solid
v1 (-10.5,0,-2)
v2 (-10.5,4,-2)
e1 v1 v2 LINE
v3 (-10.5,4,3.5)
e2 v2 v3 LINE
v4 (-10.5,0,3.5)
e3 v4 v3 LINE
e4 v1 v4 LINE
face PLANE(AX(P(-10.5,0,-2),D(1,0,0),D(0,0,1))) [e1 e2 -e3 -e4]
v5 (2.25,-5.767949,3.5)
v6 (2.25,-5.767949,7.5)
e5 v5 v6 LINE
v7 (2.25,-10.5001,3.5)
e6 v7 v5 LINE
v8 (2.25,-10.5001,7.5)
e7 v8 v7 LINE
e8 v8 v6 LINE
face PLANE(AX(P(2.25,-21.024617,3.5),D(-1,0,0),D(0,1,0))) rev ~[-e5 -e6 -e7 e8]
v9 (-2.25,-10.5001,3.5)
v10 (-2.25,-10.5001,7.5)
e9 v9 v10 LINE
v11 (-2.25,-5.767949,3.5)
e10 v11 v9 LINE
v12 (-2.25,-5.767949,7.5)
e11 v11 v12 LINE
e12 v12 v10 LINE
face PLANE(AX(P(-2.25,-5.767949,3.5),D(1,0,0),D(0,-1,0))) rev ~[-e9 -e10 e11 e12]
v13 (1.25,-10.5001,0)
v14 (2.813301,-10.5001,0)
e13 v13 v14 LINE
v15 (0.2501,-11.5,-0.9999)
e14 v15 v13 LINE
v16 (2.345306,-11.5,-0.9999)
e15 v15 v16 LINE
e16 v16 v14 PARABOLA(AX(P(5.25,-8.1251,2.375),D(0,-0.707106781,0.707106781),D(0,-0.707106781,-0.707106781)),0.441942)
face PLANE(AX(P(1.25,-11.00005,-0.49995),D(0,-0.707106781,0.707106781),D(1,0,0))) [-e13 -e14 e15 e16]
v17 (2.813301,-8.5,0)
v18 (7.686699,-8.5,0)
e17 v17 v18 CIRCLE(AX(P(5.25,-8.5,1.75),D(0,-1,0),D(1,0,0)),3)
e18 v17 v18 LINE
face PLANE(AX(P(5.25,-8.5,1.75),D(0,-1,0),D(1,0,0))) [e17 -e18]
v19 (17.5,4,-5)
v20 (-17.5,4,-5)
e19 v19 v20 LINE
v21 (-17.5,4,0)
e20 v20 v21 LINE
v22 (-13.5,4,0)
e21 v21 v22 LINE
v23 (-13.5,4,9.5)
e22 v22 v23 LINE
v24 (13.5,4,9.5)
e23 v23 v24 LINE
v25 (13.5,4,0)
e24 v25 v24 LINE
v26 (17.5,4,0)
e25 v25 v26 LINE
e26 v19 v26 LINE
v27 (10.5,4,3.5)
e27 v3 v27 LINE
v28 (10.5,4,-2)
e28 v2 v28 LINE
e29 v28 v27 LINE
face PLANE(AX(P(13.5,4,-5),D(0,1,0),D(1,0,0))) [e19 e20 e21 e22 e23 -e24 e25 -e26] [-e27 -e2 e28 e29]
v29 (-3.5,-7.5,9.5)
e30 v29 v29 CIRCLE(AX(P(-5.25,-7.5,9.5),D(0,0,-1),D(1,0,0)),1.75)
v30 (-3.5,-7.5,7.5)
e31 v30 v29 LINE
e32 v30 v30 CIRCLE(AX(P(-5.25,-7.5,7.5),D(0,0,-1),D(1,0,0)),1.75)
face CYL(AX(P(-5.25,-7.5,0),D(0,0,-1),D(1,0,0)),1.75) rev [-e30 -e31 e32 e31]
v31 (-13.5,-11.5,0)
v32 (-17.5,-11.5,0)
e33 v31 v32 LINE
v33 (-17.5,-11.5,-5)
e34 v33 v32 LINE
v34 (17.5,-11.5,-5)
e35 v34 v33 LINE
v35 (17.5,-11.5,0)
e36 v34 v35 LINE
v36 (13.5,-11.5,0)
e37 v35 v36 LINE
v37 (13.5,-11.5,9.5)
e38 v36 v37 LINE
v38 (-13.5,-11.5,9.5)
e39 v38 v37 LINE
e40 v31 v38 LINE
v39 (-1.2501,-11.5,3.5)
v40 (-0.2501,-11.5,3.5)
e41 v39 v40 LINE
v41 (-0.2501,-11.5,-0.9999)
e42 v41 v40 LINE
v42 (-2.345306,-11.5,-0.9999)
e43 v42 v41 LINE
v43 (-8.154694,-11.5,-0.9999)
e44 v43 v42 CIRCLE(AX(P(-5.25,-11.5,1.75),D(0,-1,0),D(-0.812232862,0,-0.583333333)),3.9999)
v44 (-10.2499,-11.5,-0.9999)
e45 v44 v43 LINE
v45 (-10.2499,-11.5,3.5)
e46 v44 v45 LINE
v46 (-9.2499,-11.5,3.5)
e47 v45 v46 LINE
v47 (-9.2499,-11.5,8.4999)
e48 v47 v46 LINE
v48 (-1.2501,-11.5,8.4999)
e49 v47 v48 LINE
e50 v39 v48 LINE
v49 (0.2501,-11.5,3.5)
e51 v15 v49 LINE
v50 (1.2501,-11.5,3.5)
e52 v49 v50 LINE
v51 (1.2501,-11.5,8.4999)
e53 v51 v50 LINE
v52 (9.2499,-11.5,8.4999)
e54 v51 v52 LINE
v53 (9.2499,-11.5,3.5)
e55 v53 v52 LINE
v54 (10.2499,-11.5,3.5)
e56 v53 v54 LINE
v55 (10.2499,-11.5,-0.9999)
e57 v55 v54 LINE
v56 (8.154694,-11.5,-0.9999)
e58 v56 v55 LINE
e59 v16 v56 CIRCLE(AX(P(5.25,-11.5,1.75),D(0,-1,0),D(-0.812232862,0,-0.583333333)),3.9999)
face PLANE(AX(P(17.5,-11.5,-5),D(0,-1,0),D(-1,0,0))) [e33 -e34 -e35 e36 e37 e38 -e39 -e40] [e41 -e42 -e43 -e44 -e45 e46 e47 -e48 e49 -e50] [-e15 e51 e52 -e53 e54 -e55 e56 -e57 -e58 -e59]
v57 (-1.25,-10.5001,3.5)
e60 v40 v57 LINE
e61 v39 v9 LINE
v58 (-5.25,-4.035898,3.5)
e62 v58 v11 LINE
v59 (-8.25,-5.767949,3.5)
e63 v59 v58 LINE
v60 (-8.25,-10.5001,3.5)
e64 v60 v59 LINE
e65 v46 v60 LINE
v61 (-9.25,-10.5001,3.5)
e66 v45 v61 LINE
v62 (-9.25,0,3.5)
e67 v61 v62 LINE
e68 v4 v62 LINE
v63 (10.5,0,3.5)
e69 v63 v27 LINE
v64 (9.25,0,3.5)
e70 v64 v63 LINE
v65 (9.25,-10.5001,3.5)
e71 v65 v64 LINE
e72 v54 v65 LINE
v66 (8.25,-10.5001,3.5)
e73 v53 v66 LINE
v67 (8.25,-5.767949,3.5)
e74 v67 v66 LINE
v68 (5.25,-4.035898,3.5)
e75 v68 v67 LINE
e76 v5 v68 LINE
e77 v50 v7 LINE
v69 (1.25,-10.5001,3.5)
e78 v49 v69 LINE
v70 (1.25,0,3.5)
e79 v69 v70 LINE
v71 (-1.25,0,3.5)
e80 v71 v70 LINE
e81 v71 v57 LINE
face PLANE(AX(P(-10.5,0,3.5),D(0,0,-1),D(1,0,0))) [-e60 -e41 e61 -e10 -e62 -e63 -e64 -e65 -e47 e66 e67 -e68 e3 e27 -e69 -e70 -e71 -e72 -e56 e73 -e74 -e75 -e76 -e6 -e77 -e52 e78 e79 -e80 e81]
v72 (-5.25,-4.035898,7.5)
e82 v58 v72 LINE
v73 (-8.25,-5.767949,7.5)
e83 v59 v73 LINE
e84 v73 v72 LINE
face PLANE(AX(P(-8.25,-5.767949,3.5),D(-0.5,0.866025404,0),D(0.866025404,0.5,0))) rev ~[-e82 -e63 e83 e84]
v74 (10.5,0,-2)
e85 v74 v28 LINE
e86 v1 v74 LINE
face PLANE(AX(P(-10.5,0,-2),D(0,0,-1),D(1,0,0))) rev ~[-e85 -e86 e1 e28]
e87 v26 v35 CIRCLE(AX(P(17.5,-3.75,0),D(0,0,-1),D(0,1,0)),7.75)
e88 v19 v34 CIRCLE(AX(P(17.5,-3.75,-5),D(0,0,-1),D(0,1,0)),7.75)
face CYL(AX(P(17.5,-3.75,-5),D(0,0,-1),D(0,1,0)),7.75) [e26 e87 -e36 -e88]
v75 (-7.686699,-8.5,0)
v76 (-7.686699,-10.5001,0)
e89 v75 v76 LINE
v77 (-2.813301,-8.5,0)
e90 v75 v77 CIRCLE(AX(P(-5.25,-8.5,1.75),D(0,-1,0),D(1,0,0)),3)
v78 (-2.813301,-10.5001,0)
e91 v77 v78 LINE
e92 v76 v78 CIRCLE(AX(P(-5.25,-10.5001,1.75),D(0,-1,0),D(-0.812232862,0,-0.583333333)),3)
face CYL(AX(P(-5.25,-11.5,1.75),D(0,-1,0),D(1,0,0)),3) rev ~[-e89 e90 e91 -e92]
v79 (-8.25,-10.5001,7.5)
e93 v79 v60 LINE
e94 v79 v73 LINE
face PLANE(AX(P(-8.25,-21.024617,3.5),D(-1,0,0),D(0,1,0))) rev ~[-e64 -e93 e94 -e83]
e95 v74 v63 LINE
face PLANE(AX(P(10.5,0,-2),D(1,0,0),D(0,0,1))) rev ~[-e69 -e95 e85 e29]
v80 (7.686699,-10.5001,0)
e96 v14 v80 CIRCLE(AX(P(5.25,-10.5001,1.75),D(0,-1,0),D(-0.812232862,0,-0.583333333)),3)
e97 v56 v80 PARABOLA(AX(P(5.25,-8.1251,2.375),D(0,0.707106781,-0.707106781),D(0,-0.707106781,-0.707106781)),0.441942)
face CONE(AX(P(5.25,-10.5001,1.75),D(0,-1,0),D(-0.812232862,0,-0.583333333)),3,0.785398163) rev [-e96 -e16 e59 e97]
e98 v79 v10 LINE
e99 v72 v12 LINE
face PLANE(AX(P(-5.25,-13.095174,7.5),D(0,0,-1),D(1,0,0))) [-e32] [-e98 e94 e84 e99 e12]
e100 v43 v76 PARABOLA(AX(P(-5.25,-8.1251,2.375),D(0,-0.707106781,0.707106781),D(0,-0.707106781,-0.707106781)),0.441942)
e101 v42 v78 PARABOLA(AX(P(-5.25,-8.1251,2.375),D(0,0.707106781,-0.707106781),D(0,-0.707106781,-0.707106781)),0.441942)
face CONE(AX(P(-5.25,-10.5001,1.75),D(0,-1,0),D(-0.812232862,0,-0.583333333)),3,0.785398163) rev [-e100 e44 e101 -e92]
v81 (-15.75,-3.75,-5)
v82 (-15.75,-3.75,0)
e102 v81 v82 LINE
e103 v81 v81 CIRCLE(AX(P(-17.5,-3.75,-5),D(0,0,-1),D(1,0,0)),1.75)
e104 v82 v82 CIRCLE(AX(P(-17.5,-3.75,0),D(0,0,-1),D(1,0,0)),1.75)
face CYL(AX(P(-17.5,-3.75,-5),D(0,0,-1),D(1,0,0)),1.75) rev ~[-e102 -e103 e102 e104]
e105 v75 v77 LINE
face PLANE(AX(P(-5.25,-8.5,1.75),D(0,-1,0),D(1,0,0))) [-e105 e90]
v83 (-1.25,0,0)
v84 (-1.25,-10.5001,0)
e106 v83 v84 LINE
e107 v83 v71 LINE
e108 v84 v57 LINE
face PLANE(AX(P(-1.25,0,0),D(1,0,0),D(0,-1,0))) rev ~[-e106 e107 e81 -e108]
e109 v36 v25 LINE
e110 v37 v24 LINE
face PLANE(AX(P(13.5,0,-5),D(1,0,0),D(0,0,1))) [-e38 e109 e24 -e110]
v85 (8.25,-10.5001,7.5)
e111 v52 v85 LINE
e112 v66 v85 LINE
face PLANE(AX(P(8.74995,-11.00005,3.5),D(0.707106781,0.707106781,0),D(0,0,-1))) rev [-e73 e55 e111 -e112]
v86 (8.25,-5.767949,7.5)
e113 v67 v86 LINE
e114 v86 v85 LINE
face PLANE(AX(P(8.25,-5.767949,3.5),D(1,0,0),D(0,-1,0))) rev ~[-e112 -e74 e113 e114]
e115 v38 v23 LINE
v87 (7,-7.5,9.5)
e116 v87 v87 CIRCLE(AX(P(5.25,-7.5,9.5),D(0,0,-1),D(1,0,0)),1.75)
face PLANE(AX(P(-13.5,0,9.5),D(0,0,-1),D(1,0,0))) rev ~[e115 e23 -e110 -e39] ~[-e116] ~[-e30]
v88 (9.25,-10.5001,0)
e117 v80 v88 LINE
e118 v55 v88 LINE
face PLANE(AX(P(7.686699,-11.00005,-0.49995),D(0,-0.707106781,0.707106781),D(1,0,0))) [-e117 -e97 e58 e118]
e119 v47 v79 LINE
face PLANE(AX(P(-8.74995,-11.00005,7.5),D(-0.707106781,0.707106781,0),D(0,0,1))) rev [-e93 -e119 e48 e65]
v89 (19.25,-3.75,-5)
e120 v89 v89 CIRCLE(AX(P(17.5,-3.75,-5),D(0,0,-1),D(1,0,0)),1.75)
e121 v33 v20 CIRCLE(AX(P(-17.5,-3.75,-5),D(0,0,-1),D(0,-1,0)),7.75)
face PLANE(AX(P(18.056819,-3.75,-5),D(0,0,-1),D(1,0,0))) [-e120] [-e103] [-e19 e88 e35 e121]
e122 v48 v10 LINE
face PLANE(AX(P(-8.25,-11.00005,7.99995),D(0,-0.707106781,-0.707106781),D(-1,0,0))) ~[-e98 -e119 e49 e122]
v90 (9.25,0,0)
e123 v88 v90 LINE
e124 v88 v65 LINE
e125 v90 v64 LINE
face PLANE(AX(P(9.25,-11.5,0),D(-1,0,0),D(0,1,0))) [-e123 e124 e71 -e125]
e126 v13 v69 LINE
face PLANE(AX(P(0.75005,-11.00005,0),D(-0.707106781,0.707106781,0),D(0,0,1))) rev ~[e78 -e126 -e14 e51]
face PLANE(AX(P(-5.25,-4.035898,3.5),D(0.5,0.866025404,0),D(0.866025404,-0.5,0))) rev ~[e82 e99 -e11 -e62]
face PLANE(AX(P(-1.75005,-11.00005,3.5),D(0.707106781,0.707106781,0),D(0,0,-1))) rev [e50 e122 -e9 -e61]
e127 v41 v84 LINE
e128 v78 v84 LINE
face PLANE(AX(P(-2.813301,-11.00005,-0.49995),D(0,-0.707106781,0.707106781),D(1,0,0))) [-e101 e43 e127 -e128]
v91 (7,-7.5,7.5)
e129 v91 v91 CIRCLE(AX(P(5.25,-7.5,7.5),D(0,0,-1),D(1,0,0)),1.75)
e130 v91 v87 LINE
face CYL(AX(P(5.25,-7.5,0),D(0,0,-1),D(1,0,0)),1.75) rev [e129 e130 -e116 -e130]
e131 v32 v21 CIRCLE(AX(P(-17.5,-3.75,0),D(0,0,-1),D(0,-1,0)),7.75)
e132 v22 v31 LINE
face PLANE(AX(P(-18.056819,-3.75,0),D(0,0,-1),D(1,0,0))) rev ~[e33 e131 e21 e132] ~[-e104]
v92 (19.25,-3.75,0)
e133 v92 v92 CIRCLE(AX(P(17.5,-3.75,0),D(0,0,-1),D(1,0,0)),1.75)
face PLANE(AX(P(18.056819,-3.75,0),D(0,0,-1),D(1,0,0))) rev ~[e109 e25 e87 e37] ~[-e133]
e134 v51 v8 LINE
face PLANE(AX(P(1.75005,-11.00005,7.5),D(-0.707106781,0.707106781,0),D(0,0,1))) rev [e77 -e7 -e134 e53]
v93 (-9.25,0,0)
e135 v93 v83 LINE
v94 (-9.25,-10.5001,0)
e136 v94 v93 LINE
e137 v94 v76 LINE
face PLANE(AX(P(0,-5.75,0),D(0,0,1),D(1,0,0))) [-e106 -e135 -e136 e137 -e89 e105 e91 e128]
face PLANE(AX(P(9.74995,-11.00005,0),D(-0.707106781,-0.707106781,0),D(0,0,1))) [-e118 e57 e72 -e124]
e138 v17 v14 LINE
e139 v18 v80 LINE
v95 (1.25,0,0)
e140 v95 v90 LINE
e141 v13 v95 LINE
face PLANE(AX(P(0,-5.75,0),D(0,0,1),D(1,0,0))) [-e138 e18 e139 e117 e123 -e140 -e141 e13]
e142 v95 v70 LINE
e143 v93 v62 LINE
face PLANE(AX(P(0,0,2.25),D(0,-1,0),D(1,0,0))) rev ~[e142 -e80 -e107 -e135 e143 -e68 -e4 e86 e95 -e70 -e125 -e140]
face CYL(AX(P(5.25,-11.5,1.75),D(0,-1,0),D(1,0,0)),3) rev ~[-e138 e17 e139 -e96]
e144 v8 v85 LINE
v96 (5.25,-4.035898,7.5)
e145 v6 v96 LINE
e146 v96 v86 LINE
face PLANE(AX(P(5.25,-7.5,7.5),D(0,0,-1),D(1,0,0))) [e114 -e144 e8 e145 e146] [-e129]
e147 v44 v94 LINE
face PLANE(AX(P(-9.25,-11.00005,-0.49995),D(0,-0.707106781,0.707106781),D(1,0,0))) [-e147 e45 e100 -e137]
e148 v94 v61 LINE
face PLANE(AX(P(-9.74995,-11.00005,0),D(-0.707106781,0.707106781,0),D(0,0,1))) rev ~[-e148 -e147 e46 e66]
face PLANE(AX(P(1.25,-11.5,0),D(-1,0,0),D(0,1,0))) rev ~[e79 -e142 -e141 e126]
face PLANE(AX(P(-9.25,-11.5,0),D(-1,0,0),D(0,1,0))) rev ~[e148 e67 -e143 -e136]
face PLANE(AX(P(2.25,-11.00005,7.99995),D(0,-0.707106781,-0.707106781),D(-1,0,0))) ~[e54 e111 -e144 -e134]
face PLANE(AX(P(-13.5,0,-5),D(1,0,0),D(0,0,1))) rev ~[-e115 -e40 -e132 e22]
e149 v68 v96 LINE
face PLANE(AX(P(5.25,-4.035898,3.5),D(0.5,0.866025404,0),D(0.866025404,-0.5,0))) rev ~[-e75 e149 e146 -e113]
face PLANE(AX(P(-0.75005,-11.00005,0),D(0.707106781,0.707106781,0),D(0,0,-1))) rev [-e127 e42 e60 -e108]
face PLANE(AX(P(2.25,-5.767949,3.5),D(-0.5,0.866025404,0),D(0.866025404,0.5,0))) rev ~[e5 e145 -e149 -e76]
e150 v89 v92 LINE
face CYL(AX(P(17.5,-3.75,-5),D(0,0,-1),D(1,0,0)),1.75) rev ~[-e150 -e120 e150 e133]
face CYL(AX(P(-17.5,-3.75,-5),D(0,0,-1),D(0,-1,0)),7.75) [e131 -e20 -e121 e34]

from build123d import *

# Parameters (mm, degrees)
F1_DEPTH      = 3.5
F0_W          = 1.25
F0_H          = 11.5
F2_W          = 21
F2_H          = 11.5
F3_DEPTH      = 2
F4_W          = 27
F4_H          = 14.5
F4_W_2        = 21
F4_H_2        = 5.5
F5_DEPTH      = 11.5
F5_DEPTH_BACK = 4
F6_R          = 1.75
F7_DEPTH      = 25
F9_DEPTH      = 4
F10_R         = 3
F11_DEPTH     = 3
F12_SIZE      = 0.9999
F13_R         = 1.75
F14_DEPTH     = 5


# Not quite as in the source:
# - a fillet or chamfer is up to 0.001 mm smaller than in the source, because OpenCascade refuses the exact size


with BuildPart() as f1:
    # F0 (on Top) → F1 (new body)
    with BuildSketch(Plane.XY):
        Polygon((1.25, 0), (0, 0), (-1.25, 0), (-1.25, -11.5), (0, -11.5), (1.25, -11.5), align=None)
    extrude(amount=F1_DEPTH)



with BuildPart() as f1b:
    # F0 (on Top) → F1, piece 2 (new body)
    with BuildSketch(Plane.XY):
        with Locations((-9.875, -5.75)):
            Rectangle(F0_W, F0_H)
    extrude(amount=F1_DEPTH)


with BuildPart() as f1c:
    # F0 (on Top) → F1, piece 3 (new body)
    with BuildSketch(Plane.XY):
        with Locations((9.875, -5.75)):
            Rectangle(F0_W, F0_H)
    extrude(amount=F1_DEPTH)


with BuildPart() as f1_1:
    add(f1.part)

    add(f1b.part)  # F3 merges F1b

    add(f1c.part)  # F3 merges F1c
    # F2 (on Top) → F3 (join)
    with BuildSketch(Plane.XY):
        with Locations((0, -5.75)):
            Rectangle(F2_W, F2_H)
    extrude(amount=-F3_DEPTH)

    # F4 (on Front) → F5 (join, two sides)
    with BuildSketch(Plane.XZ) as f5_sk:
        with Locations((0, 2.25)):
            Rectangle(F4_W, F4_H)
        with Locations((0, 0.75)):
            Rectangle(F4_W_2, F4_H_2, mode=Mode.SUBTRACT)
    extrude(amount=F5_DEPTH)
    extrude(f5_sk.sketch, amount=-F5_DEPTH_BACK)

    # F6 (on face) → F7 (cut)
    with BuildSketch(Plane.XY):
        with Locations((5.25, -7.5)):
            Circle(F6_R)
        with Locations((-5.25, -7.5)):
            Circle(F6_R)
    extrude(amount=F7_DEPTH, mode=Mode.SUBTRACT)

    # F8 (on face) → F9 (cut)
    with BuildSketch(Plane(origin=(0, 0, 3.5), x_dir=(1, 0, 0), z_dir=(0, 0, -1))):
        Polygon((2.25, 5.7679491924), (5.25, 4.0358983849), (8.25, 5.7679491924), (8.25, 9.2320508076), (5.25, 10.9641016151), (2.25, 9.2320508076), align=None)
        Polygon((2.25, 21.0246167397), (2.25, 9.2320508076), (5.25, 10.9641016151), (8.25, 9.2320508076), (8.25, 21.0246167397), align=None)
        Polygon((-2.25, 21.0246167397), (-8.25, 21.0246167397), (-8.25, 9.2320508076), (-8.25, 5.7679491924), (-5.25, 4.0358983849), (-2.25, 5.7679491924), (-2.25, 9.2320508076), align=None)
    extrude(amount=-F9_DEPTH, mode=Mode.SUBTRACT)

    # F10 (on face) → F11 (cut)
    with BuildSketch(Plane.XZ.offset(11.5)):
        with Locations((5.25, 1.75)):
            Circle(F10_R)
        with Locations((-5.25, 1.75)):
            Circle(F10_R)
    extrude(amount=-F11_DEPTH, mode=Mode.SUBTRACT)

    # F12 (size 1 in the source; OpenCascade refuses exactly that, so slightly less here)
    f12_edges = [f1_1.edges().sort_by_distance(p)[0] for p in [
        (-1.25, -11.5, 1.75),
        (-9.25, -11.5, 1.75),
        (-2.031651, -11.5, 0),
        (-8.468349, -11.5, 0),
        (2.031651, -11.5, 0),
        (1.25, -11.5, 1.75),
        (5.25, -11.5, -1.25),
        (8.468349, -11.5, 0),
        (9.25, -11.5, 1.75),
        (-5.25, -11.5, -1.25),
        (-8.25, -11.5, 5.5),
        (-5.25, -11.5, 7.5),
        (-2.25, -11.5, 5.5),
        (2.25, -11.5, 5.5),
        (5.25, -11.5, 7.5),
        (8.25, -11.5, 5.5),
    ]]
    chamfer(f12_edges, length=F12_SIZE)

    # F13 (on face) → F14 (join)
    with BuildSketch(Plane(origin=(0, 0, -5), x_dir=(1, 0, 0), z_dir=(0, 0, -1))):
        with BuildLine():
            Line((13.5, -4), (17.5, -4))
            ThreePointArc((17.5, -4), (25.25, 3.75), (17.5, 11.5))
            Line((17.5, 11.5), (13.5, 11.5))
            Line((13.5, 11.5000000001), (13.5, -4))
        make_face()
        with Locations((17.5, 3.75)):
            Circle(F13_R, mode=Mode.SUBTRACT)
        with BuildLine():
            ThreePointArc((-17.5, 11.5), (-25.25, 3.75), (-17.5, -4))
            Line((-17.5, -4), (-13.5, -4))
            Line((-13.5, -4), (-13.5, 11.5000000001))
            Line((-13.5, 11.5), (-17.5, 11.5))
        make_face()
        with Locations((-17.5, 3.75)):
            Circle(F13_R, mode=Mode.SUBTRACT)
    extrude(amount=-F14_DEPTH)


solid = f1_1.part
